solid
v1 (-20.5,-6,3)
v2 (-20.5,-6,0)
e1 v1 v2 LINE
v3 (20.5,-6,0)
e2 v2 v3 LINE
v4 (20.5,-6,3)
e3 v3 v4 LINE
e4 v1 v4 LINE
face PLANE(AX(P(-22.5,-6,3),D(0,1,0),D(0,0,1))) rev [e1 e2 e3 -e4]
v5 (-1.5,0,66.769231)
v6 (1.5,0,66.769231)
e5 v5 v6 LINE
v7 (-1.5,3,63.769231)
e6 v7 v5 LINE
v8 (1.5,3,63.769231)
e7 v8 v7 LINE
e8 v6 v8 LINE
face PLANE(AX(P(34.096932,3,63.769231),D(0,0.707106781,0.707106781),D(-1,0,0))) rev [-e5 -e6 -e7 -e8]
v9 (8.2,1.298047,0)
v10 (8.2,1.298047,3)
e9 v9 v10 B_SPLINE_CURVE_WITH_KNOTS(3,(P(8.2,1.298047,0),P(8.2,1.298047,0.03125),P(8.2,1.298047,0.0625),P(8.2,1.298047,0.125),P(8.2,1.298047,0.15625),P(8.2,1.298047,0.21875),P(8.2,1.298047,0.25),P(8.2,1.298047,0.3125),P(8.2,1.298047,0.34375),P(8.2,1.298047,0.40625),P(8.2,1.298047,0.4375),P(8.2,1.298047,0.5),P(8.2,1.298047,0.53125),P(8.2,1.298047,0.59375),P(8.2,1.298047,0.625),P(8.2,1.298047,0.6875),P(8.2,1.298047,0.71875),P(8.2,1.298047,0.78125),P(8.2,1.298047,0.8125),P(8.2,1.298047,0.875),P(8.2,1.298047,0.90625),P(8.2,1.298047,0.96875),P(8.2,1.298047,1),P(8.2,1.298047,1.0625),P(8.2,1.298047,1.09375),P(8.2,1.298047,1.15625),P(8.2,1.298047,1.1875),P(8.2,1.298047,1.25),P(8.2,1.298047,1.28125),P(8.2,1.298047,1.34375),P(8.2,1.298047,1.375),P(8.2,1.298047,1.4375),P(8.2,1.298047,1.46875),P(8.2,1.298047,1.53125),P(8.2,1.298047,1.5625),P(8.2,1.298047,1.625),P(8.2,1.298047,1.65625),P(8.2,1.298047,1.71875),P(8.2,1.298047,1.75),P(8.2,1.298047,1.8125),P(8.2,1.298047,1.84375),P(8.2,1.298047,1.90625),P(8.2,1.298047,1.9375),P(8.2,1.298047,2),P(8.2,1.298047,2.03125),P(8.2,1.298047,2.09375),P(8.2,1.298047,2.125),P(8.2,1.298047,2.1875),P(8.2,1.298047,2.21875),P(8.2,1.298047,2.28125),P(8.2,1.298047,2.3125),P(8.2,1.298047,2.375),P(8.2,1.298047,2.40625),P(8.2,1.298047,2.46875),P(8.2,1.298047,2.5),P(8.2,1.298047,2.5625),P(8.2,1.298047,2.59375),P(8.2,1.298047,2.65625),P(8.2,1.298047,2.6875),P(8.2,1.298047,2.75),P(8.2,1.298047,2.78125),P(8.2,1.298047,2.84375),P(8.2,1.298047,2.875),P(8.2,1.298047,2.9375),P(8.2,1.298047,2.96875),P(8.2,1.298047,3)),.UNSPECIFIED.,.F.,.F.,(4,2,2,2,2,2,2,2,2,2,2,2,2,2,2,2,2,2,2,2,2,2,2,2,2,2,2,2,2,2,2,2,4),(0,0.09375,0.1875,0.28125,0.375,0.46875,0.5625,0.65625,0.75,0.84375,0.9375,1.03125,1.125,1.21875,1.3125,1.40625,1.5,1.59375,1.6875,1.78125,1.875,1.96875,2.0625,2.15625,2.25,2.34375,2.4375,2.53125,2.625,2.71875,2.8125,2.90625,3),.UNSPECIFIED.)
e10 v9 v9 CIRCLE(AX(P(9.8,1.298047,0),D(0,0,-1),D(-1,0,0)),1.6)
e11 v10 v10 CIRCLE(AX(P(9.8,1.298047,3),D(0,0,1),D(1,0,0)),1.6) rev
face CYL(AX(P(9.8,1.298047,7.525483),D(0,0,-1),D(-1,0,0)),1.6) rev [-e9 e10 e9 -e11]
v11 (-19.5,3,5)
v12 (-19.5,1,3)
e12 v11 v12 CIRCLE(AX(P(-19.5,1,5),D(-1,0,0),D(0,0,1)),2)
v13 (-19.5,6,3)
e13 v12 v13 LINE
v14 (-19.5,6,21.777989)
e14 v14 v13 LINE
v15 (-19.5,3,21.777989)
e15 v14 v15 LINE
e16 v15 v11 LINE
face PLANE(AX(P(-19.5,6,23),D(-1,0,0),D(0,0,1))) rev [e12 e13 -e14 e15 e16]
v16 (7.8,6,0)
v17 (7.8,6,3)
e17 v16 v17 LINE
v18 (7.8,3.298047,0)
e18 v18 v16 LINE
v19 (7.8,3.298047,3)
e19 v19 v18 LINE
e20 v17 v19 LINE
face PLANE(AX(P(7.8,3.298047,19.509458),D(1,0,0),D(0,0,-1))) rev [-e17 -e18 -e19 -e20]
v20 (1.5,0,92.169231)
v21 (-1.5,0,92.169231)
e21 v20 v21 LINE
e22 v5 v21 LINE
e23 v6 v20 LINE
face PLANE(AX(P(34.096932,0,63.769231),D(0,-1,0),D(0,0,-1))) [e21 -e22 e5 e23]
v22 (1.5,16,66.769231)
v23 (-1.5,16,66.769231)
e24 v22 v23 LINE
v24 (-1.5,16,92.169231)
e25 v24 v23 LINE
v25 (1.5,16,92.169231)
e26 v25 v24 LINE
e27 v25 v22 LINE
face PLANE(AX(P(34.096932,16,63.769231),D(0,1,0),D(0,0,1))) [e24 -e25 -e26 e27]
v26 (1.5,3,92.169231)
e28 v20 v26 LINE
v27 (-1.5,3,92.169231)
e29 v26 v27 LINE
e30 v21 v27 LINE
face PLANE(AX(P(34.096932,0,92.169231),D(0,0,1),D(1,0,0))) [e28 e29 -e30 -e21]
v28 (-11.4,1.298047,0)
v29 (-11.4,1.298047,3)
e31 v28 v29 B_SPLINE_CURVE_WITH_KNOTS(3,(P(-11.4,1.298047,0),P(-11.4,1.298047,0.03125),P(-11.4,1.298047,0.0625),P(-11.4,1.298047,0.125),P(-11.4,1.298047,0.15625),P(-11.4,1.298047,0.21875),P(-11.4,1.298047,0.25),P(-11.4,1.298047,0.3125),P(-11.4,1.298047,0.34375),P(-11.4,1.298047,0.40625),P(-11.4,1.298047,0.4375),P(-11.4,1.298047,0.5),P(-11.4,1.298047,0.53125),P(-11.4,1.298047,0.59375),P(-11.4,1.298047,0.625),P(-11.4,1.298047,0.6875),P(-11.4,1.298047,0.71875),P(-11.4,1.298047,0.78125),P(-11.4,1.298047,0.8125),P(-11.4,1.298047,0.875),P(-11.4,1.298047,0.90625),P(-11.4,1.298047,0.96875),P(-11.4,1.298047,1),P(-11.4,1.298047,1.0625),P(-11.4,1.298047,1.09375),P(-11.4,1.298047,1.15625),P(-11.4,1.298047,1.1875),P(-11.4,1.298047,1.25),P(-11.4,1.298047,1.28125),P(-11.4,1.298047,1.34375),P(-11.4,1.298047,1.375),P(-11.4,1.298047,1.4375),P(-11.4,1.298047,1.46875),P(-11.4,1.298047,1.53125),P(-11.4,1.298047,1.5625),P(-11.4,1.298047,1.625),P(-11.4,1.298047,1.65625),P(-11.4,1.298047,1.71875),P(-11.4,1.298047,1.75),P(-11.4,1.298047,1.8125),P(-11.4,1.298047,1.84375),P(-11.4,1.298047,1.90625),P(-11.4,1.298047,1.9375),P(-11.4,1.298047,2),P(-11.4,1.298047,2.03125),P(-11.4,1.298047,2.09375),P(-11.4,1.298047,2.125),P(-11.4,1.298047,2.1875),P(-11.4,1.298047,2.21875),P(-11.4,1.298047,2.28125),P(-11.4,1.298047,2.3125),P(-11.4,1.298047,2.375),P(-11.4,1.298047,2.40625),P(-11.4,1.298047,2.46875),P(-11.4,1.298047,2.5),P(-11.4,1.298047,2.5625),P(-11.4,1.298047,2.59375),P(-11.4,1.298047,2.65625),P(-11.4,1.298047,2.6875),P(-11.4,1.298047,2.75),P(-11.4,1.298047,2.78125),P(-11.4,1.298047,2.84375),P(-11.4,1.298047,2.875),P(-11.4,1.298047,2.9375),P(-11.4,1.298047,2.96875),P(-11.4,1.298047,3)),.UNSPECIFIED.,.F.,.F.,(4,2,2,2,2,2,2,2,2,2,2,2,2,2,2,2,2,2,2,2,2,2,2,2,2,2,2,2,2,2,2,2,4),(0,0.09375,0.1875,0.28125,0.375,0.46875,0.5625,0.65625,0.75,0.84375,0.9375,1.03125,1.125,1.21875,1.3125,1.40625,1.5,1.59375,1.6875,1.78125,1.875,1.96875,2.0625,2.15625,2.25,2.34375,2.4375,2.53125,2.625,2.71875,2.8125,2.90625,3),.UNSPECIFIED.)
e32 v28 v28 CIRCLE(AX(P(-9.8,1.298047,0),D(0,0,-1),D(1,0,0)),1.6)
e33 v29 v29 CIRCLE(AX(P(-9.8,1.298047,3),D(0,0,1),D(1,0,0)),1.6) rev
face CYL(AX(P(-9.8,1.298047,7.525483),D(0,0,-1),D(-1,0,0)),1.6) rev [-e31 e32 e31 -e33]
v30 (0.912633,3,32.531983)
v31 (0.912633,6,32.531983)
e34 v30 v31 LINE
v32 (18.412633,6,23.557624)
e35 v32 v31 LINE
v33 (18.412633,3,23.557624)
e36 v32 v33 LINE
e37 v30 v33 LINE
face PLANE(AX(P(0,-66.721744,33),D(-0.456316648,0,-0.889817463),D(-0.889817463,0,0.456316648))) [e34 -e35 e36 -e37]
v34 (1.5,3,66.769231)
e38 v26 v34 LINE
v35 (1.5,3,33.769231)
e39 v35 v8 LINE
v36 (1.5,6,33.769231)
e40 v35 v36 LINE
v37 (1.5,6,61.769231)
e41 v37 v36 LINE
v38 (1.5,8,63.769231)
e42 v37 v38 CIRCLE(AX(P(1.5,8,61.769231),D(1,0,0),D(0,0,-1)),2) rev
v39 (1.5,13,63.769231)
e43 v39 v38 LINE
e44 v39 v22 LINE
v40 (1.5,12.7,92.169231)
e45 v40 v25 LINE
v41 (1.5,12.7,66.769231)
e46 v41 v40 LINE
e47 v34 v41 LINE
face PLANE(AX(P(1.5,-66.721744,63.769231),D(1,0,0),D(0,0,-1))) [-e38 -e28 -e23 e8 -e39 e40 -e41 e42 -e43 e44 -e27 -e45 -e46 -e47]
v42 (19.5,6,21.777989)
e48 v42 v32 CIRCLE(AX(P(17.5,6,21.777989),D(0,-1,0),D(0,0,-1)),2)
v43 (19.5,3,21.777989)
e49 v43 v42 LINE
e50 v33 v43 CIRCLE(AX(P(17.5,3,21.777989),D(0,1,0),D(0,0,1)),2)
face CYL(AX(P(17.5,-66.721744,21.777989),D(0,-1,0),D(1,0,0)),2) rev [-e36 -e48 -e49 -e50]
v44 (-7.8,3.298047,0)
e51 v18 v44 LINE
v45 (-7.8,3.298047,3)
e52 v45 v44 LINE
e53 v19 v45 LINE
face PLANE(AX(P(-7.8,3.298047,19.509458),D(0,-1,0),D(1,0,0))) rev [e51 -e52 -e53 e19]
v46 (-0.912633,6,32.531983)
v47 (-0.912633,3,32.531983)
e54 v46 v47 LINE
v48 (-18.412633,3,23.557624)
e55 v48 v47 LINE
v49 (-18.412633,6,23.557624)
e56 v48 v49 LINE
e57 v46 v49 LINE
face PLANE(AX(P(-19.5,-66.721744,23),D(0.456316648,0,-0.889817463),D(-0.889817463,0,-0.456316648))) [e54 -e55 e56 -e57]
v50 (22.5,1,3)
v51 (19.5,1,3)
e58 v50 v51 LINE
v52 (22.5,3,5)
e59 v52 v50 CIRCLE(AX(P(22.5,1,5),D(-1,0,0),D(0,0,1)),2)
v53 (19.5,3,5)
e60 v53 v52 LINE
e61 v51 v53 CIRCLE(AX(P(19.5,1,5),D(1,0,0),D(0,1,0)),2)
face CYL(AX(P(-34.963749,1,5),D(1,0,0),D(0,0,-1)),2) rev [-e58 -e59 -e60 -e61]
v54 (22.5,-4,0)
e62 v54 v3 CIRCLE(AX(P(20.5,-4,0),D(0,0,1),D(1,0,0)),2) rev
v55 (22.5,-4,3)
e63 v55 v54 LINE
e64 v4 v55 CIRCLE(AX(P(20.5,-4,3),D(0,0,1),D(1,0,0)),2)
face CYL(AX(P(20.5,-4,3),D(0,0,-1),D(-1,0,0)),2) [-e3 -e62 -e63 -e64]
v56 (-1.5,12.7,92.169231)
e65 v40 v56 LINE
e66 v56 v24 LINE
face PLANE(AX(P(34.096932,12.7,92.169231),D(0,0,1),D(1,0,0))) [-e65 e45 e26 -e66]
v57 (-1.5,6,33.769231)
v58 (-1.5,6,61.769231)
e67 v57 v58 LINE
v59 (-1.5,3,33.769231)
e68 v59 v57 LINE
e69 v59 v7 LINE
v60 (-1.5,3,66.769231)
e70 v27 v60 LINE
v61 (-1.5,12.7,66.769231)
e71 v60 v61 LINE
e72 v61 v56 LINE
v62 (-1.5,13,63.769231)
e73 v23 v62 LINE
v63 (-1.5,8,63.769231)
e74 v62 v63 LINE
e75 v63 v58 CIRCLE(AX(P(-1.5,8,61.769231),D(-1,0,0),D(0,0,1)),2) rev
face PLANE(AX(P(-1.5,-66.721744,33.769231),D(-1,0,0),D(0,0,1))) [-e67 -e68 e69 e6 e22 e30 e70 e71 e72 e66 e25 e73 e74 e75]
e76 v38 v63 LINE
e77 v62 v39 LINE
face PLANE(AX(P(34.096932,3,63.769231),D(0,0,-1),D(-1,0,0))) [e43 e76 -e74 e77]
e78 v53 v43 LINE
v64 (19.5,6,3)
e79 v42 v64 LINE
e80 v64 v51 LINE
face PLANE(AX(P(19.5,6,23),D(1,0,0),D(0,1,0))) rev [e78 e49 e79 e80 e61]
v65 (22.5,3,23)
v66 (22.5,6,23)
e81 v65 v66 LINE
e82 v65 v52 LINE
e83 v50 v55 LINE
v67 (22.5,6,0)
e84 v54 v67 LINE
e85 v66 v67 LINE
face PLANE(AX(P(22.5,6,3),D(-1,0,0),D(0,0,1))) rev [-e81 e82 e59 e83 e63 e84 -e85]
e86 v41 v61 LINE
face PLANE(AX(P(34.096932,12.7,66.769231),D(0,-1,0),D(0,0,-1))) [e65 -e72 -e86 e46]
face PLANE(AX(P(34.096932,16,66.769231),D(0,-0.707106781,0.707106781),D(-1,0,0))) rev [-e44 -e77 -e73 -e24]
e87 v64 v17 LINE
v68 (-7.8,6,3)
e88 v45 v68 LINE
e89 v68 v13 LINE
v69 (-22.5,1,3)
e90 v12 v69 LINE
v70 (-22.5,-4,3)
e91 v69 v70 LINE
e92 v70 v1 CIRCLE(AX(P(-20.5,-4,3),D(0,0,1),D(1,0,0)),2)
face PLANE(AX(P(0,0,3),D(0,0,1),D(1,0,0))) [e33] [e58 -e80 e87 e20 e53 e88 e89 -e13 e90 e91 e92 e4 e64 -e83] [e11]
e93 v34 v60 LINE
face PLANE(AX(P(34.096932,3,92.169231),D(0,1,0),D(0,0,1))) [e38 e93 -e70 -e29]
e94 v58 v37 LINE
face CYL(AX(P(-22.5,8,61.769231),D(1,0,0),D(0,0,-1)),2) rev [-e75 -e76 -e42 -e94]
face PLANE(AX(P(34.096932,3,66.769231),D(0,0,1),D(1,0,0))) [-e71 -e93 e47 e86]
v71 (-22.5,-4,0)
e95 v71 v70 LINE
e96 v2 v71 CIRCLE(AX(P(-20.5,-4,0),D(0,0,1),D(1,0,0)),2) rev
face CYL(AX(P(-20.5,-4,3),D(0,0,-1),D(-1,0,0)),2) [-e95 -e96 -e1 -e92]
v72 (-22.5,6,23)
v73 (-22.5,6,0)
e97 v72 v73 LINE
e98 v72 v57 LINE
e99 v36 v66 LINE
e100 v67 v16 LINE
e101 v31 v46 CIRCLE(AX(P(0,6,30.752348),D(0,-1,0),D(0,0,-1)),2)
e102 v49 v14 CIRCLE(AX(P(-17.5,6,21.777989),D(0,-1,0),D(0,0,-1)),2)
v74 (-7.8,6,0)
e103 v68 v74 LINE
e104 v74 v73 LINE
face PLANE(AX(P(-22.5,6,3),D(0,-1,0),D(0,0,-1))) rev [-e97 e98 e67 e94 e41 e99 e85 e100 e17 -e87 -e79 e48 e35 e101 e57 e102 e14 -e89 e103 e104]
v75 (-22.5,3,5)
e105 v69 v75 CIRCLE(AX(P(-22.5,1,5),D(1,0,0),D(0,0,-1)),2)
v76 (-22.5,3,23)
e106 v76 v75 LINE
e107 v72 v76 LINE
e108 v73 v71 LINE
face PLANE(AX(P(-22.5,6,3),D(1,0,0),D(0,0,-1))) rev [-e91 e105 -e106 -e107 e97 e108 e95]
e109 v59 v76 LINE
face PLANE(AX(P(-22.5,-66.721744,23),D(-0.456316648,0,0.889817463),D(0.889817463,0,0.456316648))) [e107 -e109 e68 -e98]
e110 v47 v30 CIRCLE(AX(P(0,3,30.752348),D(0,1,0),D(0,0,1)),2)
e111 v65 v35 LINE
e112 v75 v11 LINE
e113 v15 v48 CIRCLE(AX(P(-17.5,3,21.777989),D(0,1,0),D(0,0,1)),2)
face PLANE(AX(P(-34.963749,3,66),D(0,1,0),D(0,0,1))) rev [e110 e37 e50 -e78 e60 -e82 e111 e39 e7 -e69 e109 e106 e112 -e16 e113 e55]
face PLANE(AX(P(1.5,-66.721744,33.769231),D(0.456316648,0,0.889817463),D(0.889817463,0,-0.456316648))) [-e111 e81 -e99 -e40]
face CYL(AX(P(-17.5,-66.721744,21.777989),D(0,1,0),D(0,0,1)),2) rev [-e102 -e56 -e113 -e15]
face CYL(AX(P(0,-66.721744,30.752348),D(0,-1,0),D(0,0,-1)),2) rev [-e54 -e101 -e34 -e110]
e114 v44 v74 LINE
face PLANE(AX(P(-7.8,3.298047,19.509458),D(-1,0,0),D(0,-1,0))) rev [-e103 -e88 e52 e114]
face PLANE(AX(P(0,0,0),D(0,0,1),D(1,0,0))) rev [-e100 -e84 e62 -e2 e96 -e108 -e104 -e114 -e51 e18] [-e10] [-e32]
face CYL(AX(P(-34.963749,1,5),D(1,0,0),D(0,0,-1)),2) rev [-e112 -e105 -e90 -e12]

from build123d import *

# Parameters (mm, degrees)
SKETCH1_W                      = 45
SKETCH1_H                      = 12
BOSS_EXTRUDE1_DEPTH            = 3
SKETCH2_W                      = 3
SKETCH2_H                      = 12
BOSS_EXTRUDE2_DEPTH            = 20
BOSS_EXTRUDE3_DEPTH            = 12
CUT_EXTRUDE3_REACH             = 70.4
SKETCH4_W                      = 32.230769231
SKETCH4_H                      = 9
CUT_EXTRUDE4_REACH             = 70.4
SKETCH5_W                      = 30.769230769
SKETCH5_H                      = 9
CUT_EXTRUDE4_DIRECTION_2_REACH = 70.4
BOSS_EXTRUDE6_DEPTH            = 3
CHAMFER4_SIZE                  = 3
CHAMFER5_SIZE                  = 3
SKETCH9_W                      = 15.6
SKETCH9_H                      = 5.40390508
CUT_EXTRUDE5_DEPTH             = 3
SKETCH10_R                     = 1.6
CUT_EXTRUDE6_DEPTH             = 3
FILLET1_R                      = 2
FILLET2_R                      = 2
FILLET3_R                      = 2


with BuildPart() as part:
    # Sketch1 → Boss-Extrude1 (new body)
    with BuildSketch(Plane.XY):
        Rectangle(SKETCH1_W, SKETCH1_H)
    extrude(amount=BOSS_EXTRUDE1_DEPTH)

    # Sketch2 → Boss-Extrude2 (add)
    with BuildSketch(Plane.XY.offset(3)):
        with Locations((-21, 0)):
            Rectangle(SKETCH2_W, SKETCH2_H)
        with Locations((21, 0)):
            Rectangle(SKETCH2_W, SKETCH2_H)
    extrude(amount=BOSS_EXTRUDE2_DEPTH)

    # Sketch3 → Boss-Extrude3 (add)
    with BuildSketch(Plane(origin=(0, 6, 0), x_dir=(1, 0, 0), z_dir=(0, 1, 0))):
        Polygon((-19.5, -23), (0, -33), (19.5, -23), (22.5, -23), (1.5, -33.769230769), (1.5, -63.769230769), (-1.5, -63.769230769), (-1.5, -33.769230769), (-22.5, -23), align=None)
    extrude(amount=-BOSS_EXTRUDE3_DEPTH)

    # Cut-Extrude3: up to this face of the body (flat: up to its plane)
    cut_extrude3_end = Plane(part.part.faces().sort_by_distance((-1.5, 0, 48.769230769))[0])
    # Sketch4 → Cut-Extrude3 (cut, up to the picked face)
    with BuildSketch(Plane(origin=(1.5, 0, 0), x_dir=(0, 0, -1), z_dir=(1, 0, 0)), mode=Mode.PRIVATE) as cut_extrude3_sk1:
        with Locations((-49.884615385, -1.5)):
            Rectangle(SKETCH4_W, SKETCH4_H)
    cut_extrude3_tool1 = split(extrude(cut_extrude3_sk1.sketch, amount=-CUT_EXTRUDE3_REACH, mode=Mode.PRIVATE), bisect_by=cut_extrude3_end, keep=Keep.BOTH, mode=Mode.PRIVATE)
    add(cut_extrude3_tool1.solids().sort_by(Axis((1.5, -1.5, 49.884615), (-1, 0, 0)))[0], mode=Mode.SUBTRACT)

    # Cut-Extrude4: up to this face of the body (flat: up to its plane)
    cut_extrude4_end = Plane(part.part.faces().sort_by_distance((-22.5, 0, 11.5))[0])
    # Sketch5 → Cut-Extrude4 (cut, up to the picked face)
    with BuildSketch(Plane(origin=(1.5, 0, 0), x_dir=(0, 0, -1), z_dir=(1, 0, 0)), mode=Mode.PRIVATE) as cut_extrude4_sk1:
        with Locations((-18.384615385, -1.5)):
            Rectangle(SKETCH5_W, SKETCH5_H)
    cut_extrude4_tool1 = split(extrude(cut_extrude4_sk1.sketch, amount=-CUT_EXTRUDE4_REACH, mode=Mode.PRIVATE), bisect_by=cut_extrude4_end, keep=Keep.BOTH, mode=Mode.PRIVATE)
    add(cut_extrude4_tool1.solids().sort_by(Axis((1.5, -1.5, 18.384615), (-1, 0, 0)))[0], mode=Mode.SUBTRACT)

    # Cut-Extrude4 direction 2: up to this face of the body (flat: up to its plane)
    cut_extrude4_direction_2_end = Plane(part.part.faces().sort_by_distance((22.5, 0, 11.5))[0])
    # Sketch5 → Cut-Extrude4 direction 2 (cut, up to the picked face)
    with BuildSketch(Plane(origin=(1.5, 0, 0), x_dir=(0, 0, -1), z_dir=(1, 0, 0)), mode=Mode.PRIVATE) as cut_extrude4_direction_2_sk1:
        with Locations((-18.384615385, -1.5)):
            Rectangle(SKETCH5_W, SKETCH5_H)
    cut_extrude4_direction_2_tool1 = split(extrude(cut_extrude4_direction_2_sk1.sketch, amount=CUT_EXTRUDE4_DIRECTION_2_REACH, mode=Mode.PRIVATE), bisect_by=cut_extrude4_direction_2_end, keep=Keep.BOTH, mode=Mode.PRIVATE)
    add(cut_extrude4_direction_2_tool1.solids().sort_by(Axis((1.5, -1.5, 18.384615), (1, 0, 0)))[0], mode=Mode.SUBTRACT)

    # Sketch8 → Boss-Extrude6 (add)
    with BuildSketch(Plane.ZY.offset(1.5)):
        Polygon((63.769230769, 0), (92.169230769, 0), (92.169230769, 3), (66.769230769, 3), (66.769230769, 12.7), (92.169230769, 12.7), (92.169230769, 16), (85.741661946, 16), (63.769230769, 16), (63.769230769, 6), (63.769230769, 3), align=None)
    extrude(amount=-BOSS_EXTRUDE6_DEPTH)

    # Chamfer4
    chamfer4_edges = [part.edges().sort_by_distance(p)[0] for p in [
        (0, 16, 63.769230769),
    ]]
    chamfer(chamfer4_edges, length=CHAMFER4_SIZE)

    # Chamfer5
    chamfer5_edges = [part.edges().sort_by_distance(p)[0] for p in [
        (0, 0, 63.769230769),
    ]]
    chamfer(chamfer5_edges, length=CHAMFER5_SIZE - 0.0001)  # a hair under: the kernel refuses the full size

    # Sketch9 → Cut-Extrude5 (cut)
    with BuildSketch(Plane(origin=(0, 0, 0), x_dir=(-1, 0, 0), z_dir=(0, 0, -1))):
        with Locations((0, 6)):
            Rectangle(SKETCH9_W, SKETCH9_H)
    extrude(amount=-CUT_EXTRUDE5_DEPTH, mode=Mode.SUBTRACT)

    # Sketch10 → Cut-Extrude6 (cut)
    with BuildSketch(Plane(origin=(0, 0, 0), x_dir=(-1, 0, 0), z_dir=(0, 0, -1))):
        with Locations((-9.8, 1.29804746)):
            Circle(SKETCH10_R)
        with Locations((9.8, 1.29804746)):
            Circle(SKETCH10_R)
    extrude(amount=-CUT_EXTRUDE6_DEPTH, mode=Mode.SUBTRACT)

    # Fillet1
    fillet1_edges = [part.edges().sort_by_distance(p)[0] for p in [
        (19.5, 4.5, 23),
        (0, 6, 63.769230769),
        (0, 4.5, 33),
        (-19.5, 4.5, 23),
    ]]
    fillet(fillet1_edges, radius=FILLET1_R)

    # Fillet2
    fillet2_edges = [part.edges().sort_by_distance(p)[0] for p in [
        (21, 3, 3),
        (-21, 3, 3),
    ]]
    fillet(fillet2_edges, radius=FILLET2_R)

    # Fillet3
    fillet3_edges = [part.edges().sort_by_distance(p)[0] for p in [
        (-22.5, -6, 1.5),
        (22.5, -6, 1.5),
    ]]
    fillet(fillet3_edges, radius=FILLET3_R)


solid = part.part
